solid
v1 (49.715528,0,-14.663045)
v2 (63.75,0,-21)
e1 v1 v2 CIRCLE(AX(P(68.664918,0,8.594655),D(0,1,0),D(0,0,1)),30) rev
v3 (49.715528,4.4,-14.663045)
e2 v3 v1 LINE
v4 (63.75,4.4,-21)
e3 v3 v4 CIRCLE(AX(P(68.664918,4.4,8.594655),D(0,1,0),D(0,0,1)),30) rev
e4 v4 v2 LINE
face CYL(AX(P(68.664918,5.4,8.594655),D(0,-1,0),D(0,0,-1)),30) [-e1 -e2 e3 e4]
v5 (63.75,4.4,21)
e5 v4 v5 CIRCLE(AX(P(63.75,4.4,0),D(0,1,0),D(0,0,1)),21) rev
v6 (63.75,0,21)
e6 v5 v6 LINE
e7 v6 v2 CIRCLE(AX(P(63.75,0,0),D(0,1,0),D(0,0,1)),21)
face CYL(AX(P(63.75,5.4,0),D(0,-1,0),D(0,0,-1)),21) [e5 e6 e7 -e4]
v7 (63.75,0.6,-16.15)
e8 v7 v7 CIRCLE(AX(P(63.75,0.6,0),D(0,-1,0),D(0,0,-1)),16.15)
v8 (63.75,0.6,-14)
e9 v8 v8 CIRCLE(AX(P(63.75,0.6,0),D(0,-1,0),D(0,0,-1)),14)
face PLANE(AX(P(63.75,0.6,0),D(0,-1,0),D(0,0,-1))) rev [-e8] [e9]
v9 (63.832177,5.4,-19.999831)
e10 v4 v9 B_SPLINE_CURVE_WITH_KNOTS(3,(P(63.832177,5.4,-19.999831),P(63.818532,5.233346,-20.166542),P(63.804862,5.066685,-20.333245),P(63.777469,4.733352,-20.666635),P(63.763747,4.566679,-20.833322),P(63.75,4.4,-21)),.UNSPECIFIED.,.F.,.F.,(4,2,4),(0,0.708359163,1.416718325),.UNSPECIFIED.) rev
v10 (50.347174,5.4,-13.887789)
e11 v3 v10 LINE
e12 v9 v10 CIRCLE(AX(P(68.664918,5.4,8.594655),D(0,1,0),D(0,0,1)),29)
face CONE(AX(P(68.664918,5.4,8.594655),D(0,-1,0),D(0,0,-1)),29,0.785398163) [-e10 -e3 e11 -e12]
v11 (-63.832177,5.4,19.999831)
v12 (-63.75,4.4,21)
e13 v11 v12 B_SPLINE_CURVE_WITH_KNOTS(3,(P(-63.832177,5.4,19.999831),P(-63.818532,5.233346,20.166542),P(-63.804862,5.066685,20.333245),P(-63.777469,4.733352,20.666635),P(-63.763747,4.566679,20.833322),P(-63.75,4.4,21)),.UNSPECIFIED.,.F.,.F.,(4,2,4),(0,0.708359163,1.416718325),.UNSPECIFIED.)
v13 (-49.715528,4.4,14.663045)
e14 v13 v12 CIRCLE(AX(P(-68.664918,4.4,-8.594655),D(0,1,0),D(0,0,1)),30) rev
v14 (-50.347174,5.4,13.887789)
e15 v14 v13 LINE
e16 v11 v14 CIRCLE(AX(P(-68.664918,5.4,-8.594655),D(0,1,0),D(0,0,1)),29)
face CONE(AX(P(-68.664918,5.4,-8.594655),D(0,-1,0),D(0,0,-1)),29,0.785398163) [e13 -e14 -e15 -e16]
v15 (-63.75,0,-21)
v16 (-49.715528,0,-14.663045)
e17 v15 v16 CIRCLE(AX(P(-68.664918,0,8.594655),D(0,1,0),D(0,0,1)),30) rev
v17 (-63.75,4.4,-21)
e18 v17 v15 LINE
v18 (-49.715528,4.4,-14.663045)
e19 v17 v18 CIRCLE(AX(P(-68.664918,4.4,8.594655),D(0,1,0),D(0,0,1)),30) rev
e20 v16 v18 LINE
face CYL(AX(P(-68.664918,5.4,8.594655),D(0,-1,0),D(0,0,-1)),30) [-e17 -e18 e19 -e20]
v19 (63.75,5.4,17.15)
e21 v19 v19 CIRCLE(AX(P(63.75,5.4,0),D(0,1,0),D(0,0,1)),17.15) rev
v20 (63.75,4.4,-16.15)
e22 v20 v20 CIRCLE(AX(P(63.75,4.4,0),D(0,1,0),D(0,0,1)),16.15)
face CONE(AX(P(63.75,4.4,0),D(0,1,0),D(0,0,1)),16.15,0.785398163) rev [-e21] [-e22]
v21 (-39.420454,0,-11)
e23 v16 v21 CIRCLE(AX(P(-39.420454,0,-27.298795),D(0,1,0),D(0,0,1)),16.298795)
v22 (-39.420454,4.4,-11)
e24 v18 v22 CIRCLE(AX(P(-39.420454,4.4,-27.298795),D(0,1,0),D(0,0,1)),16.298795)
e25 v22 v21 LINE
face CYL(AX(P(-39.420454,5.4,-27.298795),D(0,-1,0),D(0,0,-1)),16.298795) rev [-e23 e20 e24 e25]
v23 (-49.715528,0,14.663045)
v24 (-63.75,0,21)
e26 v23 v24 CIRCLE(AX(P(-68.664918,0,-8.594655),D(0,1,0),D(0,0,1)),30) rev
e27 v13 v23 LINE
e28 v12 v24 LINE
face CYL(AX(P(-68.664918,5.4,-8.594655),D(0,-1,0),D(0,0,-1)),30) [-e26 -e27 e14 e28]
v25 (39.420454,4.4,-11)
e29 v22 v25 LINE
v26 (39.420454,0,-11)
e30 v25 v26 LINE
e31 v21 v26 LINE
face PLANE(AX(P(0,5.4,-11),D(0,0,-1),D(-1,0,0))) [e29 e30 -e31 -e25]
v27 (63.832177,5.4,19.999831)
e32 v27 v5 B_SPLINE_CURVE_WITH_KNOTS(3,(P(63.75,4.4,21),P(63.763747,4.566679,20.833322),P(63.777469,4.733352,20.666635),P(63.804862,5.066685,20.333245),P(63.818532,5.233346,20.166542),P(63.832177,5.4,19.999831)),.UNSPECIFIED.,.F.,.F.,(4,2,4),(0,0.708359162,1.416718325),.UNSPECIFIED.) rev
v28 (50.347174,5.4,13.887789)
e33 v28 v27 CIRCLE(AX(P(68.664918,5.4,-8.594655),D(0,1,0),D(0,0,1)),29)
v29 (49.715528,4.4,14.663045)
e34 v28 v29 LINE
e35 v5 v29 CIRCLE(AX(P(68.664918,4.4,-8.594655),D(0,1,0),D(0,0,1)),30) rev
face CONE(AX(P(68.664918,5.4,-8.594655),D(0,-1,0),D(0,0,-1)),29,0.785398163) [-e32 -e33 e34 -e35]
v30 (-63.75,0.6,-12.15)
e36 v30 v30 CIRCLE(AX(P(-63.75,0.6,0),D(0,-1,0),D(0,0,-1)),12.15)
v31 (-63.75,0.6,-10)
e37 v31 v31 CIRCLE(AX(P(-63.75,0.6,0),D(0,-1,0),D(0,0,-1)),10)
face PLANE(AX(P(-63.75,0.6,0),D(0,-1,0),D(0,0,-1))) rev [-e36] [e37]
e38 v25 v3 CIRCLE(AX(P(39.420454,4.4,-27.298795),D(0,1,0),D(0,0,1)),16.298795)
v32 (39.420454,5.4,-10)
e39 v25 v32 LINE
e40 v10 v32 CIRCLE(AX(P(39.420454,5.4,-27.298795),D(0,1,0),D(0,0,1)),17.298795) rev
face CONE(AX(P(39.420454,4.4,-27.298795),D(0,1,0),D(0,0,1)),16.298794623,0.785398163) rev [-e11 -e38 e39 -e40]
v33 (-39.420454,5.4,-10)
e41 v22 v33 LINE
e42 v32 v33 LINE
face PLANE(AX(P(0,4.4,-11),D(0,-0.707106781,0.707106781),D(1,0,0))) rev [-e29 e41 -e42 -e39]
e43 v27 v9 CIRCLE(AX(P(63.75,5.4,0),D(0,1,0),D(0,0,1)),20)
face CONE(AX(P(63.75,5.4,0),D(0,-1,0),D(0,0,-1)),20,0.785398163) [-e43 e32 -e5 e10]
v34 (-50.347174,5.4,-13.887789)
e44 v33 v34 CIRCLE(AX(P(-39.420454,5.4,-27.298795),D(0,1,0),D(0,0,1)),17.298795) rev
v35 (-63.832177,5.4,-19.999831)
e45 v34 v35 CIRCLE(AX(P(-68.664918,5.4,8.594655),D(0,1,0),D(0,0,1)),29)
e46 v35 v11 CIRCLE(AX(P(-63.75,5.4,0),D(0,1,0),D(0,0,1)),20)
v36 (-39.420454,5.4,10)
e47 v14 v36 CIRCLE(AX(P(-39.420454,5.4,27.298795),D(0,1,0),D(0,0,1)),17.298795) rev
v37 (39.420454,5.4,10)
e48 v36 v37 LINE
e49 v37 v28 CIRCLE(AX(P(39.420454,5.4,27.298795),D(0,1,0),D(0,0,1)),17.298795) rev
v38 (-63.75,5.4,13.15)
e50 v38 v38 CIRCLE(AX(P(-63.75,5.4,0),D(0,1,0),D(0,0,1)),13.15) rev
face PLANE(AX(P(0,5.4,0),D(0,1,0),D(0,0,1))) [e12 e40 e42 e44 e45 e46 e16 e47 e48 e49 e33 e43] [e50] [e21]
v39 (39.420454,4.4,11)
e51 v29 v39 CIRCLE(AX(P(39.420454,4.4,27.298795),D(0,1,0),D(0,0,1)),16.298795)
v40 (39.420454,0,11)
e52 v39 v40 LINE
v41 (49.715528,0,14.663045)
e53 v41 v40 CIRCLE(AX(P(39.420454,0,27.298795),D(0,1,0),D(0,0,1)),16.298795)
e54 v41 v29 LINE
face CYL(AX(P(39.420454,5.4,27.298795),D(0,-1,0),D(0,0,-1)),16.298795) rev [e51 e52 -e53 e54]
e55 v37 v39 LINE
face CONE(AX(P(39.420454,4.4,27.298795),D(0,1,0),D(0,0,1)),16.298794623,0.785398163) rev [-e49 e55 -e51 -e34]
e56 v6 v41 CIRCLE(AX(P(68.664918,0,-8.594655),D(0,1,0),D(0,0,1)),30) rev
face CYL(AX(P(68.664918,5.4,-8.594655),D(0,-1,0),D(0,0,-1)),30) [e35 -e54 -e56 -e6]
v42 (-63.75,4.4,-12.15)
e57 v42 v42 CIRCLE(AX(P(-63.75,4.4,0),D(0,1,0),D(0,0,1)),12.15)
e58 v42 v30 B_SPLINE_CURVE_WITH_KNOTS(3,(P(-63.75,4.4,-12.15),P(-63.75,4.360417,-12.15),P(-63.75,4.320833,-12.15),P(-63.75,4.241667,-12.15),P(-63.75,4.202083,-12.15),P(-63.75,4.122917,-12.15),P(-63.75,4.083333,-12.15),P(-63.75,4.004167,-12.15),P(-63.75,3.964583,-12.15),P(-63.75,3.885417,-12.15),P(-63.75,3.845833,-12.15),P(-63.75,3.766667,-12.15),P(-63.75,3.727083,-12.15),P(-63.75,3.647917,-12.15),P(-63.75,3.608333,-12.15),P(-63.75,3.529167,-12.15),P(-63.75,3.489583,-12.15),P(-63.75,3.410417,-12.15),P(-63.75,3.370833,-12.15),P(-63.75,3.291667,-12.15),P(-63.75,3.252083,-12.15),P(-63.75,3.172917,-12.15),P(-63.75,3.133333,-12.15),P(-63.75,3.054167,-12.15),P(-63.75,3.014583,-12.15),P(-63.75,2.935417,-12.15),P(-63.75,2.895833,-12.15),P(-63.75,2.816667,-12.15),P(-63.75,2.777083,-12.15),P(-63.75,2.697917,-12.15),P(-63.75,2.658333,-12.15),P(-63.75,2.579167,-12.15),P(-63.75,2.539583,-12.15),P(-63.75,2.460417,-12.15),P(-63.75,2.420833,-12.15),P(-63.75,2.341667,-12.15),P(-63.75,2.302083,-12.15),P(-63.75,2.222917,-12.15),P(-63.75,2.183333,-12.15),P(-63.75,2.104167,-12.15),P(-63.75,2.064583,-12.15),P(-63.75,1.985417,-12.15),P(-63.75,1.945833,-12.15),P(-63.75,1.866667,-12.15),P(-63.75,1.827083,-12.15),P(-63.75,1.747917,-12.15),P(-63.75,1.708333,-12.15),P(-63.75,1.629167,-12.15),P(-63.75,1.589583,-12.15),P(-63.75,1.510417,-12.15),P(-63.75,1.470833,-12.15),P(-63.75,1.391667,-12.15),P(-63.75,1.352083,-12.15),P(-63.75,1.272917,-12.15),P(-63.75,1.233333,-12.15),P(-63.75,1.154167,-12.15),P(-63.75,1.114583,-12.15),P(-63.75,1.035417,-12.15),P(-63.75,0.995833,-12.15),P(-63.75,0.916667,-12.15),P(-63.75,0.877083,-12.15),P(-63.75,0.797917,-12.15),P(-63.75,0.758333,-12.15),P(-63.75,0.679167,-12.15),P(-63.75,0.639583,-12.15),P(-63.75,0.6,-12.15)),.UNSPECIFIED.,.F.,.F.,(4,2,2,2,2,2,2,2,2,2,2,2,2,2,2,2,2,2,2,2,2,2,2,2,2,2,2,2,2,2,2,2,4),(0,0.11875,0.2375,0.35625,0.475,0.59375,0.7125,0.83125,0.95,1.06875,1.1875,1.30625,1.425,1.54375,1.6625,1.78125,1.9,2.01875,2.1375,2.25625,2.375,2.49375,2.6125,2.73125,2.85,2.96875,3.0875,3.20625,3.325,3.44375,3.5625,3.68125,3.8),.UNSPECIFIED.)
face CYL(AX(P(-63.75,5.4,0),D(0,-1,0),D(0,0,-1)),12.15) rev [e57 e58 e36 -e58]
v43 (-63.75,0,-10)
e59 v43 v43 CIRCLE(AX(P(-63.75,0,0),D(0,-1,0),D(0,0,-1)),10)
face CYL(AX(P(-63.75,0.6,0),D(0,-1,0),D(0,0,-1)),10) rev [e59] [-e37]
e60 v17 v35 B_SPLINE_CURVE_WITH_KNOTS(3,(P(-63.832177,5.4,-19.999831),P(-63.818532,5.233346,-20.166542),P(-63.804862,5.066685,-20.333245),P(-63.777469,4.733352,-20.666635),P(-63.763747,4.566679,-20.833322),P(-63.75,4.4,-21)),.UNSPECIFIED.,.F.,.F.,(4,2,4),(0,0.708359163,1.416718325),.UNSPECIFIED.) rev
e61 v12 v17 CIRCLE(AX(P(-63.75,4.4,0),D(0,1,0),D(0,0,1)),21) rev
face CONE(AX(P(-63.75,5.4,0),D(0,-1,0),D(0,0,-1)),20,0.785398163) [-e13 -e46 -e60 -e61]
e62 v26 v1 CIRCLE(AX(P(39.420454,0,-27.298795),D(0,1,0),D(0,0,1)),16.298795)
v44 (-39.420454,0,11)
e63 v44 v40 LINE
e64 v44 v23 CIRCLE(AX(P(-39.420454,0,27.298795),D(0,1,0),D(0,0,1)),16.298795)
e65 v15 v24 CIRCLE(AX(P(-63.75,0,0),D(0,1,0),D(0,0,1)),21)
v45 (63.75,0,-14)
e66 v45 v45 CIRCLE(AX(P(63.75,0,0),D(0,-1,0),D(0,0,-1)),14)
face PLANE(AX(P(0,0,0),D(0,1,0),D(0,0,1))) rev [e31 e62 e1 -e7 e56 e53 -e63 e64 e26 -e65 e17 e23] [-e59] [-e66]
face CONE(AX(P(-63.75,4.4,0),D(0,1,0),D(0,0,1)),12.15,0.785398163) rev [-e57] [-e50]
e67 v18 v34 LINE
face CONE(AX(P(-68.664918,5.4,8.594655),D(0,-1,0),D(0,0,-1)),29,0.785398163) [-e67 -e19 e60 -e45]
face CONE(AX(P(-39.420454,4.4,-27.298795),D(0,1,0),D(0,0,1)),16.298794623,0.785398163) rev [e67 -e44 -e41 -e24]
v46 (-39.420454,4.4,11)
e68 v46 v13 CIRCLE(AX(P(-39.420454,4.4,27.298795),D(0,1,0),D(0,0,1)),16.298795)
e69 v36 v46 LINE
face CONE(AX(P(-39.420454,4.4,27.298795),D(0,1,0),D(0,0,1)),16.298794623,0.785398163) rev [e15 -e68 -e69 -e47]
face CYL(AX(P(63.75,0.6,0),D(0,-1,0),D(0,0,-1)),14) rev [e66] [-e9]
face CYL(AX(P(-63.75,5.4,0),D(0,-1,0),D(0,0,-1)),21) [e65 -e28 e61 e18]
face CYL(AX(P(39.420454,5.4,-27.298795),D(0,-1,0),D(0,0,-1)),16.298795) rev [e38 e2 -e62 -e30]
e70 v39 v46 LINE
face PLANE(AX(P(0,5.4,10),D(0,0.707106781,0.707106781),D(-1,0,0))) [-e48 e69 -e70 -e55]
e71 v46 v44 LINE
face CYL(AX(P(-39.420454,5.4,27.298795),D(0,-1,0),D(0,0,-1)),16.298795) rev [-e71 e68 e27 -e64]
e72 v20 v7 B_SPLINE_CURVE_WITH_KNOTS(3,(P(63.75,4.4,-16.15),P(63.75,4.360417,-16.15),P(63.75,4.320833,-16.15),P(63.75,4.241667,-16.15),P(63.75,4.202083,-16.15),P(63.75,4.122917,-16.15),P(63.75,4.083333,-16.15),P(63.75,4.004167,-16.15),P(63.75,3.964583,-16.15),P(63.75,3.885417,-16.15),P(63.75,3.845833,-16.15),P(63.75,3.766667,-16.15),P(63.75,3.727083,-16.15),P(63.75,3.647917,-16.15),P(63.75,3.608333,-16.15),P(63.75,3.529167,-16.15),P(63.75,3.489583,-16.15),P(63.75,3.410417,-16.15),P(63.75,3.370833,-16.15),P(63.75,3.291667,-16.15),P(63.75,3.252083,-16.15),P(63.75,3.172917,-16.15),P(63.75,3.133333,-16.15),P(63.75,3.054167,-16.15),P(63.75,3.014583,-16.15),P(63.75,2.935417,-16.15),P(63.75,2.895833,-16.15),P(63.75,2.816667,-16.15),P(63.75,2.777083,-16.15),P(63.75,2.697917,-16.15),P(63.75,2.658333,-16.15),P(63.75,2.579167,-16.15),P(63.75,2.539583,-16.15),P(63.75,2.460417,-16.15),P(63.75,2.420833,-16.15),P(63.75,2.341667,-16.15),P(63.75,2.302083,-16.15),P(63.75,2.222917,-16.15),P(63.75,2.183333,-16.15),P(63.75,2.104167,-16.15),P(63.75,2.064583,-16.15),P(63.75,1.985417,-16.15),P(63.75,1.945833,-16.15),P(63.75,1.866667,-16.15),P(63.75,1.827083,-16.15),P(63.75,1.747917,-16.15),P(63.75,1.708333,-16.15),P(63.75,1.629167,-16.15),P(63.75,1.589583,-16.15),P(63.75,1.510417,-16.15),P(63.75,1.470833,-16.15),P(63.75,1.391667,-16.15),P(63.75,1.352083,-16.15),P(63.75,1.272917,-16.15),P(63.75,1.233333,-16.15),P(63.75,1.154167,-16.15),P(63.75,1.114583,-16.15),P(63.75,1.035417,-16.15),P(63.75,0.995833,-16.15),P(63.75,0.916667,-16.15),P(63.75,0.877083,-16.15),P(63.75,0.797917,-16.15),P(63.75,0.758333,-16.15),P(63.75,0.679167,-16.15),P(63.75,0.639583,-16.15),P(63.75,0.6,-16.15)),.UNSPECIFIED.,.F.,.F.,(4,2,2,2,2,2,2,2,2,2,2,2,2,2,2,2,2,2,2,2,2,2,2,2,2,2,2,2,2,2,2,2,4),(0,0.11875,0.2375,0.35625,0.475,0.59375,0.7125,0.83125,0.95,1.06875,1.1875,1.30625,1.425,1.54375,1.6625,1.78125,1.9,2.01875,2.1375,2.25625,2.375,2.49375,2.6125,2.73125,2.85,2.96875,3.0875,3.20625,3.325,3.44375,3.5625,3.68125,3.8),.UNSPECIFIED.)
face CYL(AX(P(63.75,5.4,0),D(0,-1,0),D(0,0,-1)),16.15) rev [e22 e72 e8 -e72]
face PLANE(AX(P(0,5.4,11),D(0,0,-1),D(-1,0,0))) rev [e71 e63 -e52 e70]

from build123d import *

# Parameters (mm, degrees)
SKETCH1_R           = 12.15
SKETCH1_R_2         = 16.15
BOSS_EXTRUDE1_DEPTH = 5.4
FILLET1_R           = 30
CHAMFER1_SIZE       = 1
SKETCH2_R           = 14.75534968
SKETCH2_R_2         = 10
SKETCH2_R_3         = 19.025242353
SKETCH2_R_4         = 14
BOSS_EXTRUDE2_DEPTH = 0.6


with BuildPart() as part:
    # Sketch1 → Boss-Extrude1 (new body)
    with BuildSketch(Plane(origin=(0, 0, 0), x_dir=(1, 0, 0), z_dir=(0, 1, 0))):
        with BuildLine():
            Line((54.45294862, -21), (63.75, -21))
            ThreePointArc((63.75, -21), (84.75, 0), (63.75, 21))
            Line((63.75, 21), (54.45294862, 21))
            ThreePointArc((54.45294862, 21), (48.447855306, 13.72835863), (39.420454068, 11))
            Line((39.420454068, 11), (-39.420454068, 11))
            ThreePointArc((-39.420454068, 11), (-48.447855306, 13.72835863), (-54.45294862, 21))
            Line((-54.45294862, 21), (-63.75, 21))
            ThreePointArc((-63.75, 21), (-84.75, 0), (-63.75, -21))
            Line((-63.75, -21), (-54.45294862, -21))
            ThreePointArc((-54.45294862, -21), (-48.447855306, -13.72835863), (-39.420454068, -11))
            Line((-39.420454068, -11), (39.420454068, -11))
            ThreePointArc((39.420454068, -11), (48.447855306, -13.72835863), (54.45294862, -21))
        make_face()
        with Locations(Location((-63.75, 0, 0), (0, 0, 90))):
            Circle(SKETCH1_R, mode=Mode.SUBTRACT)
        with Locations(Location((63.75, 0, 0), (0, 0, 90))):
            Circle(SKETCH1_R_2, mode=Mode.SUBTRACT)
    extrude(amount=BOSS_EXTRUDE1_DEPTH)

    # Fillet1
    # the kernel refuses this fillet: 30 mm, written as the material it takes off along each edge
    with BuildSketch(Plane(origin=(-54.45294862, -23.24262845, -21), x_dir=(0.5987620470660618, 0, 0.8009269698251266), z_dir=(0, 1, 0))) as fillet1_piece_1:
        with BuildLine():
            CenterArc((15.193568911, -29.102905777), FILLET1_R, 104.047021464, 29.74238235)
            Line((-5.566721516, -7.44625919), (-5.981927325, -7.013126259))
            ThreePointArc((-5.981927325, -7.013126259), (-3.26391694, -3.363872367), (-0.480556182, 0.359257228))
            Line((-0.480556182, 0.359257228), (0.145630869, 0.582058116))
            ThreePointArc((0.145630869, 0.582058116), (3.95601272, 0.11261485), (7.76639457, 0.582058116))
            Line((7.76639457, 0.582058116), (7.912025439, 0))
        make_face()
    extrude(amount=51.885256901, mode=Mode.SUBTRACT)
    with BuildSketch(Plane(origin=(54.45294862, -23.24262845, -21), x_dir=(1, 0, 0), z_dir=(0, 1, 0)), Plane(origin=(-54.45294862, -23.24262845, 21), x_dir=(-1, 0, 0), z_dir=(0, 1, 0))) as fillet1_piece_2:
        with BuildLine():
            CenterArc((14.211969714, -29.594654547), FILLET1_R, 99.429309033, 29.74238235)
            Line((-4.737420548, -6.33695456), (-5.116408354, -5.87180056))
            ThreePointArc((-5.116408354, -5.87180056), (-2.458906545, -3.101047782), (-0.55338428, 0.231874618))
            Line((-0.55338428, 0.231874618), (0, 0.6))
            ThreePointArc((0, 0.6), (4.64852569, 0.6), (9.198753014, 0.591893091))
            Line((9.198753014, 0.591893091), (9.29705138, 0))
        make_face()
    extrude(amount=51.885256901, mode=Mode.SUBTRACT)
    with BuildSketch(Plane(origin=(54.45294862, -23.24262845, 21), x_dir=(1, 0, 0), z_dir=(0, 1, 0))) as fillet1_piece_3:
        with BuildLine():
            CenterArc((14.211969714, 29.594654547), FILLET1_R, 230.828308617, 29.74238235)
            Line((-4.737420548, 6.33695456), (-5.116408354, 5.87180056))
            ThreePointArc((-5.116408354, 5.87180056), (-2.458906545, 3.101047782), (-0.55338428, -0.231874618))
            Line((-0.55338428, -0.231874618), (0, -0.6))
            ThreePointArc((0, -0.6), (4.64852569, -0.6), (9.198753014, -0.591893091))
            Line((9.198753014, -0.591893091), (9.29705138, 0))
        make_face()
    extrude(amount=51.885256901, mode=Mode.SUBTRACT)

    # Chamfer1
    # the kernel refuses this chamfer: 1 mm, written as the material it takes off along each edge
    with BuildSketch(Plane(origin=(63.75, 5.4, 0), x_dir=(-0.12235070165055995, 0, 0.9924869297908239), z_dir=(-0.9924869297908239, 0, -0.12235070165055995))) as chamfer1_piece_1:
        Polygon((21, -CHAMFER1_SIZE), (21 - CHAMFER1_SIZE, 0), (21, 0), align=None)
    revolve(axis=Axis((63.75, 5.4, 0), (0, 1, 0)), revolution_arc=194.055575488, mode=Mode.SUBTRACT)
    with BuildSketch(Plane(origin=(39.420454068, 5.4, -27.298794623), x_dir=(0.6316463420707552, 0, 0.7752566662394039), z_dir=(0.7752566662394039, 0, -0.6316463420707552))) as chamfer1_piece_2:
        Polygon((16.298794623 + CHAMFER1_SIZE, 0), (16.298794623, CHAMFER1_SIZE), (16.298794623, 0), align=None)
    revolve(axis=Axis((39.420454068, 5.4, -27.298794623), (0, -1, 0)), revolution_arc=39.171691383, mode=Mode.SUBTRACT)
    with BuildSketch(Plane(origin=(39.420454068, 5.4, -11), x_dir=(0, 0, 1), z_dir=(-1, 0, 0)), Plane(origin=(-39.420454068, 5.4, 11), x_dir=(0, 0, -1), z_dir=(1, 0, 0))) as chamfer1_piece_3:
        Polygon((CHAMFER1_SIZE, 0), (0, -CHAMFER1_SIZE), (0, 0), align=None)
    extrude(amount=78.840908135, mode=Mode.SUBTRACT)
    with BuildSketch(Plane(origin=(-39.420454068, 5.4, -27.298794623), x_dir=(0, 0, 1), z_dir=(1, 0, 0))) as chamfer1_piece_4:
        Polygon((16.298794623 + CHAMFER1_SIZE, 0), (16.298794623, CHAMFER1_SIZE), (16.298794623, 0), align=None)
    revolve(axis=Axis((-39.420454068, 5.4, -27.298794623), (0, -1, 0)), revolution_arc=39.171691383, mode=Mode.SUBTRACT)
    with BuildSketch(Plane(origin=(39.420454068, 5.4, 27.298794623), x_dir=(0, 0, -1), z_dir=(-1, 0, 0))) as chamfer1_piece_5:
        Polygon((16.298794623 + CHAMFER1_SIZE, 0), (16.298794623, CHAMFER1_SIZE), (16.298794623, 0), align=None)
    revolve(axis=Axis((39.420454068, 5.4, 27.298794623), (0, -1, 0)), revolution_arc=39.171691383, mode=Mode.SUBTRACT)
    with BuildSketch(Plane(origin=(-68.664918334, 5.4, -8.594654547), x_dir=(0.6316463420707823, 0, 0.7752566662393817), z_dir=(0.7752566662393817, 0, -0.6316463420707823))) as chamfer1_piece_6:
        Polygon((30 - CHAMFER1_SIZE, 0), (30, CHAMFER1_SIZE), (30, 0), align=None)
    revolve(axis=Axis((-68.664918334, 5.4, -8.594654547), (0, -1, 0)), revolution_arc=44.477686757, mode=Mode.SUBTRACT)
    with BuildSketch(Plane(origin=(68.664918334, 5.4, -8.594654547), x_dir=(0.09247477859233537, 0, 0.9957150271660554), z_dir=(0.9957150271660554, 0, -0.09247477859233537))) as chamfer1_piece_7:
        Polygon((30, CHAMFER1_SIZE), (30 - CHAMFER1_SIZE, 0), (30, 0), align=None)
    revolve(axis=Axis((68.664918334, 5.4, -8.594654547), (0, -1, 0)), revolution_arc=44.477686757, mode=Mode.SUBTRACT)
    with BuildSketch(Plane(origin=(68.664918334, 5.4, 8.594654547), x_dir=(-0.6316463420707823, 0, -0.7752566662393817), z_dir=(-0.7752566662393817, 0, 0.6316463420707823))) as chamfer1_piece_8:
        Polygon((30, CHAMFER1_SIZE), (30 - CHAMFER1_SIZE, 0), (30, 0), align=None)
    revolve(axis=Axis((68.664918334, 5.4, 8.594654547), (0, -1, 0)), revolution_arc=44.477686757, mode=Mode.SUBTRACT)
    with BuildSketch(Plane(origin=(-68.664918334, 5.4, 8.594654547), x_dir=(-0.09247477859236329, 0, -0.9957150271660529), z_dir=(-0.9957150271660529, 0, 0.09247477859236329))) as chamfer1_piece_9:
        Polygon((30 - CHAMFER1_SIZE, 0), (30, CHAMFER1_SIZE), (30, 0), align=None)
    revolve(axis=Axis((-68.664918334, 5.4, 8.594654547), (0, -1, 0)), revolution_arc=44.477686757, mode=Mode.SUBTRACT)
    with BuildSketch(Plane(origin=(-63.75, 5.4, 0), x_dir=(0.12235070165055861, 0, -0.992486929790824), z_dir=(0.992486929790824, 0, 0.12235070165055861))) as chamfer1_piece_10:
        Polygon((21 - CHAMFER1_SIZE, 0), (21, -CHAMFER1_SIZE), (21, 0), align=None)
    revolve(axis=Axis((-63.75, 5.4, 0), (0, 1, 0)), revolution_arc=194.055575488, mode=Mode.SUBTRACT)
    with BuildSketch(Plane(origin=(-39.420454068, 5.4, 27.298794623), x_dir=(-0.6316463420707533, 0, -0.7752566662394053), z_dir=(-0.7752566662394053, 0, 0.6316463420707533))) as chamfer1_piece_11:
        Polygon((16.298794623 + CHAMFER1_SIZE, 0), (16.298794623, CHAMFER1_SIZE), (16.298794623, 0), align=None)
    revolve(axis=Axis((-39.420454068, 5.4, 27.298794623), (0, -1, 0)), revolution_arc=39.171691383, mode=Mode.SUBTRACT)
    with BuildSketch(Plane(origin=(-63.75, 5.4, 0), x_dir=(0, 0, -1), z_dir=(1, 0, 0))) as chamfer1_piece_12:
        Polygon((12.15 + CHAMFER1_SIZE, 0), (12.15, -CHAMFER1_SIZE), (12.15, 0), align=None)
    revolve(axis=Axis((-63.75, 5.4, 0), (0, 1, 0)), mode=Mode.SUBTRACT)
    with BuildSketch(Plane(origin=(63.75, 5.4, 0), x_dir=(0, 0, -1), z_dir=(1, 0, 0))) as chamfer1_piece_13:
        Polygon((16.15 + CHAMFER1_SIZE, 0), (16.15, -CHAMFER1_SIZE), (16.15, 0), align=None)
    revolve(axis=Axis((63.75, 5.4, 0), (0, 1, 0)), mode=Mode.SUBTRACT)

    # Sketch2 → Boss-Extrude2 (add)
    # profile 1 of 2: a face of its own
    with BuildSketch(Plane.XZ):
        with Locations((-63.75, 0)):
            Circle(SKETCH2_R)
        with Locations(Location((-63.75, 0, 0), (0, 0, 270))):
            Circle(SKETCH2_R_2, mode=Mode.SUBTRACT)
    # profile 2 of 2: a face of its own
    with BuildSketch(Plane.XZ):
        with Locations((63.75, 0)):
            Circle(SKETCH2_R_3)
        with Locations(Location((63.75, 0, 0), (0, 0, 270))):
            Circle(SKETCH2_R_4, mode=Mode.SUBTRACT)
    extrude(amount=-BOSS_EXTRUDE2_DEPTH)


solid = part.part
